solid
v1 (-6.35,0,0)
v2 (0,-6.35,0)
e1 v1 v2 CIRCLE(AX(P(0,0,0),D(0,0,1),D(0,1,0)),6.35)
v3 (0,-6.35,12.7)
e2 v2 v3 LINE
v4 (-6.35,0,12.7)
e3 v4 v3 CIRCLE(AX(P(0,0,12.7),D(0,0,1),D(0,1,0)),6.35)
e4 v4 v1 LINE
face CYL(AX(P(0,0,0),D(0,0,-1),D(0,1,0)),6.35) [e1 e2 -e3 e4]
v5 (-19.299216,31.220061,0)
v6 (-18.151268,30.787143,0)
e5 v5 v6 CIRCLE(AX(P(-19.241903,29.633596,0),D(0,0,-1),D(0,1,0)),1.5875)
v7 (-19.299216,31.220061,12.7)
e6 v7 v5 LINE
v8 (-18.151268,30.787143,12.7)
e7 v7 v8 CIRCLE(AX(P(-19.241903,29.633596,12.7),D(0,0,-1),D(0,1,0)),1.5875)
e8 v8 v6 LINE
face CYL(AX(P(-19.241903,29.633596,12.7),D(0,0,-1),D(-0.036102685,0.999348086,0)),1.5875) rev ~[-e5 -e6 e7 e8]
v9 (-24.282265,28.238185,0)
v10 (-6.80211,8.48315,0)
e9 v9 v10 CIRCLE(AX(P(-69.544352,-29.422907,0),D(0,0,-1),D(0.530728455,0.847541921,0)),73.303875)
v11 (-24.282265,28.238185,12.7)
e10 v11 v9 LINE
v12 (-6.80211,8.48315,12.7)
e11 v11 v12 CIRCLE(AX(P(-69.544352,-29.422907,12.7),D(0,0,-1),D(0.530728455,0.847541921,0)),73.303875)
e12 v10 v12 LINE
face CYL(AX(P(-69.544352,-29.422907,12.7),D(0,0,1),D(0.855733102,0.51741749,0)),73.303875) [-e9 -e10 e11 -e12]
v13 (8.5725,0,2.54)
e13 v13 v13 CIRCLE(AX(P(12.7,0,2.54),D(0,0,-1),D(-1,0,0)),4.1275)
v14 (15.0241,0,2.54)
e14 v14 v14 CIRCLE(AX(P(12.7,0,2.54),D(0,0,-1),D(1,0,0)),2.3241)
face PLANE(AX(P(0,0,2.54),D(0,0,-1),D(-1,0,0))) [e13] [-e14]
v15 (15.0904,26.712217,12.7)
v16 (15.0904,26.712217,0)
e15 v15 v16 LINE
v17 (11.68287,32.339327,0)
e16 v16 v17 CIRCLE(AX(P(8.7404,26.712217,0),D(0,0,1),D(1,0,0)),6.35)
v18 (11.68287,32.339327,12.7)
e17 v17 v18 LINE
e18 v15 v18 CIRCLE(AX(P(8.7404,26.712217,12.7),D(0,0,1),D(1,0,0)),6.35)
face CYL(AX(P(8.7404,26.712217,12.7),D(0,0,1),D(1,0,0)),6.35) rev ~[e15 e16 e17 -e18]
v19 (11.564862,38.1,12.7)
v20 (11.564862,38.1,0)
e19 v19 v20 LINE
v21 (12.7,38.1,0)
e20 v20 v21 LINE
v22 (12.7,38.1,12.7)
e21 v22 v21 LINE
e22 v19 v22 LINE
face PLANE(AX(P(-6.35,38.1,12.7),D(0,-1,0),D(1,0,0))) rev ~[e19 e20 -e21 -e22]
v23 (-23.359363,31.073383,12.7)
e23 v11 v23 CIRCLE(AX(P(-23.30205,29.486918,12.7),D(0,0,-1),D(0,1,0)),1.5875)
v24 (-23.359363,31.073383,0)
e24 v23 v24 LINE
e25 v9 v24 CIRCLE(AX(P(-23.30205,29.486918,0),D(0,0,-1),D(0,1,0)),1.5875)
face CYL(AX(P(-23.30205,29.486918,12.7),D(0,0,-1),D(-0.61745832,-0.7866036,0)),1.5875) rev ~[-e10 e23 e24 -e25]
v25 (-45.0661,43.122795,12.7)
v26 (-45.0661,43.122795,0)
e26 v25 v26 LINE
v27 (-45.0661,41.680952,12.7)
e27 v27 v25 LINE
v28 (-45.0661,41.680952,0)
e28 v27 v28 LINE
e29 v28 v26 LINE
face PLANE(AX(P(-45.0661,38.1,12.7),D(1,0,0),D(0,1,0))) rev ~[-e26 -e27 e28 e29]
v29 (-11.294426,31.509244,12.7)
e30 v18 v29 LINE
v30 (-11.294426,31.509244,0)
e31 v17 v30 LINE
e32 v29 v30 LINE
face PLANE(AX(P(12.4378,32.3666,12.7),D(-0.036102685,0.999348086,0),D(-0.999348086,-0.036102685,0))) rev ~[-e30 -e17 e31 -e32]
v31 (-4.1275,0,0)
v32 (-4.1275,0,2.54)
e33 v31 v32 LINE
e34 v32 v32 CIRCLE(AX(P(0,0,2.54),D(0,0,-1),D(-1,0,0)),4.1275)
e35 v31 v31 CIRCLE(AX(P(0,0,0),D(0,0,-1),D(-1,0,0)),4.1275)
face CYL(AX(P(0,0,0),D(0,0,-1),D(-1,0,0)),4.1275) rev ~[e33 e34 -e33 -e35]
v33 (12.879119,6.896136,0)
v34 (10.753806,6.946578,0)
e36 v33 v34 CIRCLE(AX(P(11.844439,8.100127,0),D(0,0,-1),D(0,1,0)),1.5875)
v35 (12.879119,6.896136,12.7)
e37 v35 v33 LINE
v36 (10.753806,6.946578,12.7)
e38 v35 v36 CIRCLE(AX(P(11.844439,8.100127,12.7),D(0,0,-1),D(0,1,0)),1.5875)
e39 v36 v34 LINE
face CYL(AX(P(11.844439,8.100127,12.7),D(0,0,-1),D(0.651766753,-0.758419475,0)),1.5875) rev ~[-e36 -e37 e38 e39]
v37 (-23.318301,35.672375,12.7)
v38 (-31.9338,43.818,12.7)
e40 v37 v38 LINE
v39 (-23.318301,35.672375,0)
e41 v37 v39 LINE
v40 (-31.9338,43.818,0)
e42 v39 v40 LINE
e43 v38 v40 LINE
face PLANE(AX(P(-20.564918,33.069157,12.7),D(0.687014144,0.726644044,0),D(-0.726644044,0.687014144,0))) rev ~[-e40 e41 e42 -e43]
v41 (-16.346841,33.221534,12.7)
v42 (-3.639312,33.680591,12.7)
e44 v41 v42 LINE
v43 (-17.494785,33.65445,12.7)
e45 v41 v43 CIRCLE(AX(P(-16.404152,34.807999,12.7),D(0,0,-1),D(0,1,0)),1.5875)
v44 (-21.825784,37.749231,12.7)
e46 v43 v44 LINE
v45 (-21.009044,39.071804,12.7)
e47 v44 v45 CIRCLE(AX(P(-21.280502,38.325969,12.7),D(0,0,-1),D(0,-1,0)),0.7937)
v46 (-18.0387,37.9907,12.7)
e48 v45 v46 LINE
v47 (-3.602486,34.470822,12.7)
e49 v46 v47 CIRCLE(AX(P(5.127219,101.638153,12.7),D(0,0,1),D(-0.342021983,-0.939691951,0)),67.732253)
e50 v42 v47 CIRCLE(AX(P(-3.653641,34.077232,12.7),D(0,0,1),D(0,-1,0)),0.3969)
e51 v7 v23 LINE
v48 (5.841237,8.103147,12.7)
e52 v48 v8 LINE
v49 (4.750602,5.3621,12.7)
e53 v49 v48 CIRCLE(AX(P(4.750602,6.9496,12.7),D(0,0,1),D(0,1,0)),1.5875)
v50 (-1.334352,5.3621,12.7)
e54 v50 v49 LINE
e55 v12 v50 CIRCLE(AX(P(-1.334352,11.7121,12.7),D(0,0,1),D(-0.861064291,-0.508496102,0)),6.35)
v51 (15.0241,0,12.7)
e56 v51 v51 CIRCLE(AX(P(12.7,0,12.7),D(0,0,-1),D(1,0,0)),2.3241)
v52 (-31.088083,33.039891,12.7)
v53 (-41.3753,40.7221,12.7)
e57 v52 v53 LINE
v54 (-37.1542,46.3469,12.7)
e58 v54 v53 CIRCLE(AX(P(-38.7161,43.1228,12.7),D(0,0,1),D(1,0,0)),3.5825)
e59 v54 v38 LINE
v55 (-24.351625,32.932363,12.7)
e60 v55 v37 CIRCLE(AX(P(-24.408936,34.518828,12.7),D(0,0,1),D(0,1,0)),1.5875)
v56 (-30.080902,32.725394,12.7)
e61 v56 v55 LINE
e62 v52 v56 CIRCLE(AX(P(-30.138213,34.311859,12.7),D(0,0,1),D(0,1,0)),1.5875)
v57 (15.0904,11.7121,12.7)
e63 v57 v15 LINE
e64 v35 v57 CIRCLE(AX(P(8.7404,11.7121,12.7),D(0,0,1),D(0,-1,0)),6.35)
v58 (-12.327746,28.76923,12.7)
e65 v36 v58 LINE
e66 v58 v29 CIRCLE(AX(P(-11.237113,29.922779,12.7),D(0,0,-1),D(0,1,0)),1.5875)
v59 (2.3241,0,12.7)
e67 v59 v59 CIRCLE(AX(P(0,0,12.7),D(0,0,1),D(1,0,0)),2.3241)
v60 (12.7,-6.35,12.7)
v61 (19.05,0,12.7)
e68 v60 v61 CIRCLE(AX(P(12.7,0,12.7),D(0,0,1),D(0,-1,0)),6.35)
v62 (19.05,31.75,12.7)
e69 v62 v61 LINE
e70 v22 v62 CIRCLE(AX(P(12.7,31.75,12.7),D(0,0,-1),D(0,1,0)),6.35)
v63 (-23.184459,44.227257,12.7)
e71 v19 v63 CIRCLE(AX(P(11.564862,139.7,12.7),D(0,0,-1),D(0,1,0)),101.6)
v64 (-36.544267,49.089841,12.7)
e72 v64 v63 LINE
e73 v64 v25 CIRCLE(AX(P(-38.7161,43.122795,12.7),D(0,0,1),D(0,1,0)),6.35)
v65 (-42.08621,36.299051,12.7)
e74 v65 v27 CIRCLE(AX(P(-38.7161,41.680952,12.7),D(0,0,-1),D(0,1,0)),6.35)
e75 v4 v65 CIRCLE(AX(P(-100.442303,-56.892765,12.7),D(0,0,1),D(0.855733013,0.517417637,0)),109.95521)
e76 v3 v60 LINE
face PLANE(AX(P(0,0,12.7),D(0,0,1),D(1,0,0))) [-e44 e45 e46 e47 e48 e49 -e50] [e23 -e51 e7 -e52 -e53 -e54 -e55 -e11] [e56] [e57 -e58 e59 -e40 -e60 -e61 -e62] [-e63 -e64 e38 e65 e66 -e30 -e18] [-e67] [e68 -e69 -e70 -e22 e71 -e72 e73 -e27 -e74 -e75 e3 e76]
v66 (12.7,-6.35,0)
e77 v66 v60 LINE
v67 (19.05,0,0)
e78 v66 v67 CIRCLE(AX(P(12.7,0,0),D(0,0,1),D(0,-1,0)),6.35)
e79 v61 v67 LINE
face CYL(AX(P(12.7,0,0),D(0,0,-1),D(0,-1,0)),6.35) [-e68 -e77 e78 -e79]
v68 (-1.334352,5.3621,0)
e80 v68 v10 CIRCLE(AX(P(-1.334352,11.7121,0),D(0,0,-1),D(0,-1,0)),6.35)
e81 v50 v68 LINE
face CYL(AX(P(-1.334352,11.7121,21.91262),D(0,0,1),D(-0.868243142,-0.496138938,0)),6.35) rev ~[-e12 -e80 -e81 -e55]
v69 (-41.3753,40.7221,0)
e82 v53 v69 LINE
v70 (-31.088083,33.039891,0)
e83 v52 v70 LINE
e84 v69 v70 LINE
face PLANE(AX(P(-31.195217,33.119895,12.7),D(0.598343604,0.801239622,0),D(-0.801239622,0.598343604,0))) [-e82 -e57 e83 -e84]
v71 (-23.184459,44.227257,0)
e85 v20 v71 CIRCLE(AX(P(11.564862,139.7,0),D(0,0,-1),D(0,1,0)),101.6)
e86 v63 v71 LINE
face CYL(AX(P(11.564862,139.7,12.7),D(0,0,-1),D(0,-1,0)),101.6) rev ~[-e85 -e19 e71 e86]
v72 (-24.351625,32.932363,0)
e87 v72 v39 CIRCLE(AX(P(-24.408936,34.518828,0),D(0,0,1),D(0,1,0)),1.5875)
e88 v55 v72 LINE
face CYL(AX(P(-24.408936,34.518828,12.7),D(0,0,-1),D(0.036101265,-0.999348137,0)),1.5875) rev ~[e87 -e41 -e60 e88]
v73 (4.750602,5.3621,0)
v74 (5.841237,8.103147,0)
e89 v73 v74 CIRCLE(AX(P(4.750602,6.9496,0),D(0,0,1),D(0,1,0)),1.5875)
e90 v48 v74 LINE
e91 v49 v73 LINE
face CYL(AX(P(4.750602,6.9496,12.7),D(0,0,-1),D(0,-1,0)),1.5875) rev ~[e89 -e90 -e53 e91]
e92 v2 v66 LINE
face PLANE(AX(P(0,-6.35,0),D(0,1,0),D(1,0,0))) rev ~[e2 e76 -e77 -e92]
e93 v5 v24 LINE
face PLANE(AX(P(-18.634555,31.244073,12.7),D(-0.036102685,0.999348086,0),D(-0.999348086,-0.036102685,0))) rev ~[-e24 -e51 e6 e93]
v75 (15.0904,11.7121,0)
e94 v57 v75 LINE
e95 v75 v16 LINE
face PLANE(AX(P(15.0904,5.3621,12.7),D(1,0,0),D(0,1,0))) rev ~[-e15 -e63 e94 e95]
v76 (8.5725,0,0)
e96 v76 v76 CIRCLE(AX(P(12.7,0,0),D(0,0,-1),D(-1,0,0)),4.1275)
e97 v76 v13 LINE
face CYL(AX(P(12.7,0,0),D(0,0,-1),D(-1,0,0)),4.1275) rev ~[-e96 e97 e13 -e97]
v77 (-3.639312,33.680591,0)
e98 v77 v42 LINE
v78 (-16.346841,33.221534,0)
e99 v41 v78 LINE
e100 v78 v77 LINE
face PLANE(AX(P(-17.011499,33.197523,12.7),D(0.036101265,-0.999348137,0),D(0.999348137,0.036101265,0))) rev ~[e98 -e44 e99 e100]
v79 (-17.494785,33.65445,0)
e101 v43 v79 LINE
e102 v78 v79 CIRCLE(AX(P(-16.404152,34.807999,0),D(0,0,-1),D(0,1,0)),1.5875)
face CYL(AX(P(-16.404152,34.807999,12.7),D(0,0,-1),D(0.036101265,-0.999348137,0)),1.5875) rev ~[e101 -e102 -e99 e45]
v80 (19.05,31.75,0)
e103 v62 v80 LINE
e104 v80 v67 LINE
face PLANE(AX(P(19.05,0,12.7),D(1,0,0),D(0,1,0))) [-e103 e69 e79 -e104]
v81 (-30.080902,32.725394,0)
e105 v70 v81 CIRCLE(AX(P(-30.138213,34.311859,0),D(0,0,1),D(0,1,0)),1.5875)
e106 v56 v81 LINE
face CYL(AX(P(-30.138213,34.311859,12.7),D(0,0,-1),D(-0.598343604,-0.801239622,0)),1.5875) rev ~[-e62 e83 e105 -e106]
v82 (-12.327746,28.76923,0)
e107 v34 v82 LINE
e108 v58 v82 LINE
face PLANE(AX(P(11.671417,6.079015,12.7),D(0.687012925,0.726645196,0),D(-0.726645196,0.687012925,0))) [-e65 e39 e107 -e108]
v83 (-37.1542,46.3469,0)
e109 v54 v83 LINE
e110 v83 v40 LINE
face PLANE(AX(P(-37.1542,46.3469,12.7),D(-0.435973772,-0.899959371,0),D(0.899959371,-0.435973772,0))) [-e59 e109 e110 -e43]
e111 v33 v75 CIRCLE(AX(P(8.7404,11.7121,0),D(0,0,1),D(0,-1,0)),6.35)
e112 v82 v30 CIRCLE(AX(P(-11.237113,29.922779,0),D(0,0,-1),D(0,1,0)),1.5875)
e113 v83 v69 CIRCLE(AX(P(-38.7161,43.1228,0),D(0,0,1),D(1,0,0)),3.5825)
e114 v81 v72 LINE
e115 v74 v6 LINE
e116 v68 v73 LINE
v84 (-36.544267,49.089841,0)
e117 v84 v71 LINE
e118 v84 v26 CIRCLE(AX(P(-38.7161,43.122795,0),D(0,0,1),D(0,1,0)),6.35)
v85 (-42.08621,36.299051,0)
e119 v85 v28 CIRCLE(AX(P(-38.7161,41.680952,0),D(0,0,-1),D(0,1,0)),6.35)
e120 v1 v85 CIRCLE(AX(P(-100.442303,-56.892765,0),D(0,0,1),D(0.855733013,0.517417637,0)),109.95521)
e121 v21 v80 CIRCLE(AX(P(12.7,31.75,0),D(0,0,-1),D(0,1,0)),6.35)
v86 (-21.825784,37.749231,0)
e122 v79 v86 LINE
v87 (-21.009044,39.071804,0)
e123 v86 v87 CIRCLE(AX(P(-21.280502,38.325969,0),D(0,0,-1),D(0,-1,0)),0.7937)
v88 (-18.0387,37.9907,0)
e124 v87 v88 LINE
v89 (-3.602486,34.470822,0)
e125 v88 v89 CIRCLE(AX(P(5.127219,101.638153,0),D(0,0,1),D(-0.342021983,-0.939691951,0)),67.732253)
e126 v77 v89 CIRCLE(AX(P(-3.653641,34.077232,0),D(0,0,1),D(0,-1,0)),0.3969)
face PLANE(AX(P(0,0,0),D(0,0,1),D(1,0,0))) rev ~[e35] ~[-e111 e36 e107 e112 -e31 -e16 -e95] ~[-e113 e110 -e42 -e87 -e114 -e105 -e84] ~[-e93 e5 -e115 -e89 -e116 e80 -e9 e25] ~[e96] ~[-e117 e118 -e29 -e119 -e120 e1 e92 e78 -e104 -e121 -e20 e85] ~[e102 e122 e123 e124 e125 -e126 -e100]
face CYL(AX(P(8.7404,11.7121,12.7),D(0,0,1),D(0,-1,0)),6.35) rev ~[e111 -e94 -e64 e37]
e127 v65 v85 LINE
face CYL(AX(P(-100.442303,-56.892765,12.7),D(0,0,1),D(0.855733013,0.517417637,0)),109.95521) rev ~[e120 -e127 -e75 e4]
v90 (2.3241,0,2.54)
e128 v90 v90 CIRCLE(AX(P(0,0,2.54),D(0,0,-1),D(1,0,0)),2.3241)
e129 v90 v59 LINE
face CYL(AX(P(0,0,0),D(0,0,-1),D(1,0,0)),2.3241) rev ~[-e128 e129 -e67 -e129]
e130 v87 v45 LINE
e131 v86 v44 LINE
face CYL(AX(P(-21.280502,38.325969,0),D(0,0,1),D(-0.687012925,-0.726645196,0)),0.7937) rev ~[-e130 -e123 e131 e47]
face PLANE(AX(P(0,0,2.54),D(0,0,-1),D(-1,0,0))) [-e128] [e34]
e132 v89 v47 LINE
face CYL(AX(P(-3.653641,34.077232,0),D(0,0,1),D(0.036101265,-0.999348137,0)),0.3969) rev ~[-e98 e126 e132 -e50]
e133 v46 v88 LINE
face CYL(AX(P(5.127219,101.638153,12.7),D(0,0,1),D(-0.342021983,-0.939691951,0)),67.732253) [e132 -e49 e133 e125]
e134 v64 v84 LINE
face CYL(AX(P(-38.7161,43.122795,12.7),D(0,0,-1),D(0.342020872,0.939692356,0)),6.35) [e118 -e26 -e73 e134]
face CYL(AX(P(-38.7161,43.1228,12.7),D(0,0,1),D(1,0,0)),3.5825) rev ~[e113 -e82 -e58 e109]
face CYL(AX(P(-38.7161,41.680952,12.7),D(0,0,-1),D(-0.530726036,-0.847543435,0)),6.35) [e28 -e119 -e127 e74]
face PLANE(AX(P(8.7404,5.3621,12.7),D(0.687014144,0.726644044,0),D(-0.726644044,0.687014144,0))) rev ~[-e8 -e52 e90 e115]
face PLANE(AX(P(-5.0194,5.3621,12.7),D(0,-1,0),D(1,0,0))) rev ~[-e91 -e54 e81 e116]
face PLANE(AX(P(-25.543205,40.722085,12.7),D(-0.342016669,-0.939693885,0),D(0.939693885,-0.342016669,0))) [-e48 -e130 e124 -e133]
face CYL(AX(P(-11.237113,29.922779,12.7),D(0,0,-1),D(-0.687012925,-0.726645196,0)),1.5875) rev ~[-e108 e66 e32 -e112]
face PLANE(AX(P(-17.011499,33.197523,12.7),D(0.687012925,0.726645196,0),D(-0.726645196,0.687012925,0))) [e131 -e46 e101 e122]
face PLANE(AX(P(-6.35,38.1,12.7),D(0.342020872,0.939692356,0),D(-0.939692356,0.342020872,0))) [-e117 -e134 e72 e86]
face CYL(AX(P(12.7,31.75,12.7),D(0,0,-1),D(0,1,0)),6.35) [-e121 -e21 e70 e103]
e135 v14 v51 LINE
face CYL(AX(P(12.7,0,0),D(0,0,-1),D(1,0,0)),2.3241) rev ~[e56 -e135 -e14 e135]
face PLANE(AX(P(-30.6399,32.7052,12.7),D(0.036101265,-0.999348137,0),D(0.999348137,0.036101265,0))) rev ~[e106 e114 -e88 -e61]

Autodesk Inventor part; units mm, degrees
ref_plane "YZ Plane" through (0, 0, 0) normal (1, 0, 0) x (0, 1, 0)
ref_plane "XZ Plane" through (0, 0, 0) normal (0, 1, 0) x (-1, 0, 0)
ref_plane "XY Plane" through (0, 0, 0) normal (0, 0, 1) x (1, 0, 0)
sketch "Sketch1" plane through (0, 0, 0) normal (0, 0, 1) x (1, 0, 0)
  circle A0 centre (0, 0) radius 2.3241
  line L0 (0, 0) -> (12.7, 0)
  circle A1 centre (12.7, 0) radius 2.3241
  line L1 (0, 0) -> (12.7, 0) construction
  line L2 (0, -6.35) -> (12.7, -6.35)
  line L3 (12.7, 6.35) -> (0, 6.35)
  arc A2 (0, 6.35) -> (0, -6.35) centre (0, 0) ccw
  arc A3 (12.7, -6.35) -> (12.7, 6.35) centre (12.7, 0) ccw
  point P0 (6.35, 0)
  dimension "d0" = 4.6482
  dimension "d1" = 12.7
  dimension "d2" = 4.6482
  dimension "d3" = 12.7
extrude "Extrusion1" add sketch "Sketch1" along normal blind 12.7
sketch "Sketch2" plane through (0, 0, 0) normal (0, 0, -1) x (-1, 0, 0)
  circle A0 centre (-12.7, 0) radius 2.3241 projected
  circle A1 centre (0, 0) radius 2.3241 projected
  circle A2 centre (-12.7, 0) radius 4.1275
  circle A3 centre (0, 0) radius 4.1275
  dimension "d6" = 8.255
  dimension "d7" = 8.255
extrude "Extrusion2" cut sketch "Sketch2" against normal blind 2.54
sketch "Sketch3" plane through (0, 0, 12.7) normal (0, 0, 1) x (1, 0, 0)
  arc A0 (0, 6.35) -> (0, -6.35) centre (0, 0) ccw projected
  arc A1 (12.7, -6.35) -> (12.7, 6.35) centre (12.7, 0) ccw projected
  line L0 (12.7, 6.35) -> (0, 6.35) projected
  arc A2 (0, 6.35) -> (0, -6.35) centre (0, 0) ccw projected
  line L1 (0, -6.35) -> (12.7, -6.35) projected
  circle A3 centre (0, 0) radius 2.3241 projected
  circle A4 centre (12.7, 0) radius 2.3241 projected
  line L2 (19.05, 0) -> (19.05, 38.1)
  line L3 (-6.35, 0) -> (-6.35, 38.1)
  arc A5 (0, 6.35) -> (0, -6.35) centre (0, 0) ccw projected
  line L4 (-6.35, 38.1) -> (19.05, 38.1)
  line L5 (-6.35, 38.1) -> (-69.85, 38.1)
  line L6 (-6.35, 38.1) -> (-72.261, 62.0897)
  line L7 (-72.261, 62.0897) -> (-72.261, 49.3897)
  arc A6 (-6.35, 0) -> (-72.261, 49.3897) centre (-100.4419, -56.8924) ccw
  line L8 (-34.5064, 31.0993) -> (-34.5064, 48.3481)
  line L9 (-45.0661, 38.1) -> (-45.0661, 52.1915)
  point P0 (0, 6.35)
  point P1 (-34.5064, 38.1)
  dimension "d10" = 38.1
  dimension "d14" = 63.5
  dimension "d15" = 20
  dimension "d16" = 12.7
extrude "Extrusion3" add sketch "Sketch3" against normal up to surface (12.7 mm away) contours A0 L3 L4 L2 A1 L0 | A6 L8 L5 L3 | L5 L8 L6
fillet "Fillet1" radius 6.35 1 edges at (19.05, 38.1, 6.35)
fillet "Fillet2" radius 101.6 1 edges at (-6.35, 38.1, 6.35)
extrude "Extrusion7" add sketch "Sketch3" against normal blind 12.7 contours A0 L3 L4 L2 A1 L0 | A6 L8 L5 L3 | A6 L5 L8 | L5 L9 L6 L8
fillet "Fillet3" radius 6.35 3 edges at (-45.0661, 52.1915, 6.35) (-45.0661, 38.1, 6.35) (19.05, 38.1, 6.35)
sketch "Sketch6" plane through (0, 0, 12.7) normal (0, 0, 1) x (1, 0, 0)
  line L0 (-36.5443, 49.0898) -> (-23.1844, 44.2272) projected
  line L1 (-26.9453, 41.2324) -> (-18.0387, 37.9907)
  arc A0 (-23.1844, 44.2272) -> (11.5648, 38.1) centre (11.5648, 139.7) ccw projected
  arc A1 (-18.0387, 37.9907) -> (5.1275, 33.9059) centre (5.1275, 101.6392) ccw
  arc A2 (-36.5443, 49.0898) -> (-45.0661, 43.1228) centre (-38.7161, 43.1228) ccw projected
  arc A3 (-26.9453, 41.2324) -> (-32.6265, 37.2544) centre (-28.3931, 37.2544) ccw
  arc A4 (-45.0661, 41.681) -> (-42.0862, 36.2991) centre (-38.7161, 41.681) ccw projected
  arc A5 (-32.6265, 36.2932) -> (-30.6399, 32.7052) centre (-28.3932, 36.2932) ccw
  line L2 (-45.0661, 41.681) -> (-45.0661, 43.1228) projected
  line L3 (-32.6265, 36.2932) -> (-32.6265, 37.2544)
  arc A6 (-6.35, 0) -> (0, -6.35) centre (0, 0) ccw projected
  arc A7 (-6.8158, 8.5058) -> (-30.6399, 32.7052) centre (-69.5437, -29.4224) ccw
  arc A8 (12.7, -6.35) -> (19.05, 0) centre (12.7, 0) ccw projected
  line L4 (-6.8158, 8.5058) -> (10.1176, 8.5058)
  line L5 (10.1176, 8.5058) -> (10.1176, 30.026)
  line L6 (12.7, 38.1) -> (11.5648, 38.1) projected
  line L7 (5.1275, 33.9059) -> (5.8843, 33.9059)
  arc A9 (10.1176, 30.026) -> (5.8843, 33.9059) centre (5.8784, 29.65) ccw
  circle A10 centre (-38.7161, 43.1228) radius 3.5825
  line L8 (-30.6399, 32.7052) -> (-41.3753, 40.7221)
  line L9 (-37.1542, 46.3469) -> (-25.5432, 40.7221)
  line L10 (-6.8158, 8.5058) -> (-5.0194, 5.3621)
  line L11 (-5.0194, 5.3621) -> (15.0904, 5.3621)
  line L12 (15.0904, 5.3621) -> (15.0904, 31.7435)
  line L13 (15.0904, 31.7435) -> (5.8842, 33.9059)
  point P0 (5.8842, 33.9059)
extrude "Extrusion8" cut sketch "Sketch6" against normal blind 12.7 contours A3 L3 A5 L8 A10 L9 L1 | L1 A1 L7 L13 A9 L5 L4 A7 L8 A5 L3 A3 | A10 L8 | L13 L12 L11 L10 L4 L5 A9 picked at (-38.0775, 41.7353)
fillet "Fillet4" radius 6.35 4 edges at (15.0904, 31.7435, 6.35) (5.8842, 33.9059, 6.35) (-5.0194, 5.3621, 6.35) (15.0904, 5.3621, 6.35)
sketch "Sketch7" plane through (0, 0, 12.7) normal (0, 0, 1) x (1, 0, 0)
  point P0 (0, 0)
sketch "Sketch8" plane through (0, 0, 12.7) normal (0, 0, 1) x (1, 0, 0)
  arc A0 (-6.8158, 8.5058) -> (-30.6399, 32.7052) centre (-69.5437, -29.4224) ccw projected
  line L0 (-30.6399, 32.7052) -> (5.4461, 34.0088)
  line L1 (5.4461, 34.0088) -> (12.4378, 32.3666)
  line L2 (10.1924, 32.894) -> (6.6005, 33.7376) projected
  line L3 (12.4378, 32.3666) -> (-28.2224, 30.8977)
  line L4 (-28.2224, 30.8977) -> (-30.6399, 32.7052)
  arc A1 (8.7404, 5.3621) -> (15.0904, 11.7121) centre (8.7404, 11.7121) ccw projected
  line L5 (8.7404, 5.3621) -> (-31.9338, 43.818)
  line L6 (-25.5432, 40.7221) -> (-37.1542, 46.3469) projected
  line L7 (11.702, 6.0501) -> (-26.744, 42.3992)
  line L8 (-26.744, 42.3992) -> (-31.9338, 43.818)
  point P0 (0, 0)
  point P1 (-20.565, 33.0692)
  point P2 (-18.6346, 31.2441)
  point P3 (11.6714, 6.079)
  point P4 (-15.0811, 31.3725)
  point P5 (-17.0115, 33.1975)
extrude "Extrusion9" add sketch "Sketch8" against normal blind 12.7
fillet "Fillet5" radius 1.5875 8 edges at (-15.0811, 31.3725, 6.35) (-27.9088, 30.9091, 6.35) (-20.565, 33.0692, 6.35) (-30.6399, 32.7052, 6.35) (8.7404, 5.3621, 6.35) (11.6714, 6.079, 6.35) (-18.6346, 31.2441, 6.35) (-17.0115, 33.1975, 6.35)
fillet "Fillet6" radius 0.7937 1 edges at (-24.6115, 40.383, 6.35)
fillet "Fillet7" radius 0.3969 1 edges at (3.2884, 33.9309, 6.35)
properties part number "Ring Bay"
